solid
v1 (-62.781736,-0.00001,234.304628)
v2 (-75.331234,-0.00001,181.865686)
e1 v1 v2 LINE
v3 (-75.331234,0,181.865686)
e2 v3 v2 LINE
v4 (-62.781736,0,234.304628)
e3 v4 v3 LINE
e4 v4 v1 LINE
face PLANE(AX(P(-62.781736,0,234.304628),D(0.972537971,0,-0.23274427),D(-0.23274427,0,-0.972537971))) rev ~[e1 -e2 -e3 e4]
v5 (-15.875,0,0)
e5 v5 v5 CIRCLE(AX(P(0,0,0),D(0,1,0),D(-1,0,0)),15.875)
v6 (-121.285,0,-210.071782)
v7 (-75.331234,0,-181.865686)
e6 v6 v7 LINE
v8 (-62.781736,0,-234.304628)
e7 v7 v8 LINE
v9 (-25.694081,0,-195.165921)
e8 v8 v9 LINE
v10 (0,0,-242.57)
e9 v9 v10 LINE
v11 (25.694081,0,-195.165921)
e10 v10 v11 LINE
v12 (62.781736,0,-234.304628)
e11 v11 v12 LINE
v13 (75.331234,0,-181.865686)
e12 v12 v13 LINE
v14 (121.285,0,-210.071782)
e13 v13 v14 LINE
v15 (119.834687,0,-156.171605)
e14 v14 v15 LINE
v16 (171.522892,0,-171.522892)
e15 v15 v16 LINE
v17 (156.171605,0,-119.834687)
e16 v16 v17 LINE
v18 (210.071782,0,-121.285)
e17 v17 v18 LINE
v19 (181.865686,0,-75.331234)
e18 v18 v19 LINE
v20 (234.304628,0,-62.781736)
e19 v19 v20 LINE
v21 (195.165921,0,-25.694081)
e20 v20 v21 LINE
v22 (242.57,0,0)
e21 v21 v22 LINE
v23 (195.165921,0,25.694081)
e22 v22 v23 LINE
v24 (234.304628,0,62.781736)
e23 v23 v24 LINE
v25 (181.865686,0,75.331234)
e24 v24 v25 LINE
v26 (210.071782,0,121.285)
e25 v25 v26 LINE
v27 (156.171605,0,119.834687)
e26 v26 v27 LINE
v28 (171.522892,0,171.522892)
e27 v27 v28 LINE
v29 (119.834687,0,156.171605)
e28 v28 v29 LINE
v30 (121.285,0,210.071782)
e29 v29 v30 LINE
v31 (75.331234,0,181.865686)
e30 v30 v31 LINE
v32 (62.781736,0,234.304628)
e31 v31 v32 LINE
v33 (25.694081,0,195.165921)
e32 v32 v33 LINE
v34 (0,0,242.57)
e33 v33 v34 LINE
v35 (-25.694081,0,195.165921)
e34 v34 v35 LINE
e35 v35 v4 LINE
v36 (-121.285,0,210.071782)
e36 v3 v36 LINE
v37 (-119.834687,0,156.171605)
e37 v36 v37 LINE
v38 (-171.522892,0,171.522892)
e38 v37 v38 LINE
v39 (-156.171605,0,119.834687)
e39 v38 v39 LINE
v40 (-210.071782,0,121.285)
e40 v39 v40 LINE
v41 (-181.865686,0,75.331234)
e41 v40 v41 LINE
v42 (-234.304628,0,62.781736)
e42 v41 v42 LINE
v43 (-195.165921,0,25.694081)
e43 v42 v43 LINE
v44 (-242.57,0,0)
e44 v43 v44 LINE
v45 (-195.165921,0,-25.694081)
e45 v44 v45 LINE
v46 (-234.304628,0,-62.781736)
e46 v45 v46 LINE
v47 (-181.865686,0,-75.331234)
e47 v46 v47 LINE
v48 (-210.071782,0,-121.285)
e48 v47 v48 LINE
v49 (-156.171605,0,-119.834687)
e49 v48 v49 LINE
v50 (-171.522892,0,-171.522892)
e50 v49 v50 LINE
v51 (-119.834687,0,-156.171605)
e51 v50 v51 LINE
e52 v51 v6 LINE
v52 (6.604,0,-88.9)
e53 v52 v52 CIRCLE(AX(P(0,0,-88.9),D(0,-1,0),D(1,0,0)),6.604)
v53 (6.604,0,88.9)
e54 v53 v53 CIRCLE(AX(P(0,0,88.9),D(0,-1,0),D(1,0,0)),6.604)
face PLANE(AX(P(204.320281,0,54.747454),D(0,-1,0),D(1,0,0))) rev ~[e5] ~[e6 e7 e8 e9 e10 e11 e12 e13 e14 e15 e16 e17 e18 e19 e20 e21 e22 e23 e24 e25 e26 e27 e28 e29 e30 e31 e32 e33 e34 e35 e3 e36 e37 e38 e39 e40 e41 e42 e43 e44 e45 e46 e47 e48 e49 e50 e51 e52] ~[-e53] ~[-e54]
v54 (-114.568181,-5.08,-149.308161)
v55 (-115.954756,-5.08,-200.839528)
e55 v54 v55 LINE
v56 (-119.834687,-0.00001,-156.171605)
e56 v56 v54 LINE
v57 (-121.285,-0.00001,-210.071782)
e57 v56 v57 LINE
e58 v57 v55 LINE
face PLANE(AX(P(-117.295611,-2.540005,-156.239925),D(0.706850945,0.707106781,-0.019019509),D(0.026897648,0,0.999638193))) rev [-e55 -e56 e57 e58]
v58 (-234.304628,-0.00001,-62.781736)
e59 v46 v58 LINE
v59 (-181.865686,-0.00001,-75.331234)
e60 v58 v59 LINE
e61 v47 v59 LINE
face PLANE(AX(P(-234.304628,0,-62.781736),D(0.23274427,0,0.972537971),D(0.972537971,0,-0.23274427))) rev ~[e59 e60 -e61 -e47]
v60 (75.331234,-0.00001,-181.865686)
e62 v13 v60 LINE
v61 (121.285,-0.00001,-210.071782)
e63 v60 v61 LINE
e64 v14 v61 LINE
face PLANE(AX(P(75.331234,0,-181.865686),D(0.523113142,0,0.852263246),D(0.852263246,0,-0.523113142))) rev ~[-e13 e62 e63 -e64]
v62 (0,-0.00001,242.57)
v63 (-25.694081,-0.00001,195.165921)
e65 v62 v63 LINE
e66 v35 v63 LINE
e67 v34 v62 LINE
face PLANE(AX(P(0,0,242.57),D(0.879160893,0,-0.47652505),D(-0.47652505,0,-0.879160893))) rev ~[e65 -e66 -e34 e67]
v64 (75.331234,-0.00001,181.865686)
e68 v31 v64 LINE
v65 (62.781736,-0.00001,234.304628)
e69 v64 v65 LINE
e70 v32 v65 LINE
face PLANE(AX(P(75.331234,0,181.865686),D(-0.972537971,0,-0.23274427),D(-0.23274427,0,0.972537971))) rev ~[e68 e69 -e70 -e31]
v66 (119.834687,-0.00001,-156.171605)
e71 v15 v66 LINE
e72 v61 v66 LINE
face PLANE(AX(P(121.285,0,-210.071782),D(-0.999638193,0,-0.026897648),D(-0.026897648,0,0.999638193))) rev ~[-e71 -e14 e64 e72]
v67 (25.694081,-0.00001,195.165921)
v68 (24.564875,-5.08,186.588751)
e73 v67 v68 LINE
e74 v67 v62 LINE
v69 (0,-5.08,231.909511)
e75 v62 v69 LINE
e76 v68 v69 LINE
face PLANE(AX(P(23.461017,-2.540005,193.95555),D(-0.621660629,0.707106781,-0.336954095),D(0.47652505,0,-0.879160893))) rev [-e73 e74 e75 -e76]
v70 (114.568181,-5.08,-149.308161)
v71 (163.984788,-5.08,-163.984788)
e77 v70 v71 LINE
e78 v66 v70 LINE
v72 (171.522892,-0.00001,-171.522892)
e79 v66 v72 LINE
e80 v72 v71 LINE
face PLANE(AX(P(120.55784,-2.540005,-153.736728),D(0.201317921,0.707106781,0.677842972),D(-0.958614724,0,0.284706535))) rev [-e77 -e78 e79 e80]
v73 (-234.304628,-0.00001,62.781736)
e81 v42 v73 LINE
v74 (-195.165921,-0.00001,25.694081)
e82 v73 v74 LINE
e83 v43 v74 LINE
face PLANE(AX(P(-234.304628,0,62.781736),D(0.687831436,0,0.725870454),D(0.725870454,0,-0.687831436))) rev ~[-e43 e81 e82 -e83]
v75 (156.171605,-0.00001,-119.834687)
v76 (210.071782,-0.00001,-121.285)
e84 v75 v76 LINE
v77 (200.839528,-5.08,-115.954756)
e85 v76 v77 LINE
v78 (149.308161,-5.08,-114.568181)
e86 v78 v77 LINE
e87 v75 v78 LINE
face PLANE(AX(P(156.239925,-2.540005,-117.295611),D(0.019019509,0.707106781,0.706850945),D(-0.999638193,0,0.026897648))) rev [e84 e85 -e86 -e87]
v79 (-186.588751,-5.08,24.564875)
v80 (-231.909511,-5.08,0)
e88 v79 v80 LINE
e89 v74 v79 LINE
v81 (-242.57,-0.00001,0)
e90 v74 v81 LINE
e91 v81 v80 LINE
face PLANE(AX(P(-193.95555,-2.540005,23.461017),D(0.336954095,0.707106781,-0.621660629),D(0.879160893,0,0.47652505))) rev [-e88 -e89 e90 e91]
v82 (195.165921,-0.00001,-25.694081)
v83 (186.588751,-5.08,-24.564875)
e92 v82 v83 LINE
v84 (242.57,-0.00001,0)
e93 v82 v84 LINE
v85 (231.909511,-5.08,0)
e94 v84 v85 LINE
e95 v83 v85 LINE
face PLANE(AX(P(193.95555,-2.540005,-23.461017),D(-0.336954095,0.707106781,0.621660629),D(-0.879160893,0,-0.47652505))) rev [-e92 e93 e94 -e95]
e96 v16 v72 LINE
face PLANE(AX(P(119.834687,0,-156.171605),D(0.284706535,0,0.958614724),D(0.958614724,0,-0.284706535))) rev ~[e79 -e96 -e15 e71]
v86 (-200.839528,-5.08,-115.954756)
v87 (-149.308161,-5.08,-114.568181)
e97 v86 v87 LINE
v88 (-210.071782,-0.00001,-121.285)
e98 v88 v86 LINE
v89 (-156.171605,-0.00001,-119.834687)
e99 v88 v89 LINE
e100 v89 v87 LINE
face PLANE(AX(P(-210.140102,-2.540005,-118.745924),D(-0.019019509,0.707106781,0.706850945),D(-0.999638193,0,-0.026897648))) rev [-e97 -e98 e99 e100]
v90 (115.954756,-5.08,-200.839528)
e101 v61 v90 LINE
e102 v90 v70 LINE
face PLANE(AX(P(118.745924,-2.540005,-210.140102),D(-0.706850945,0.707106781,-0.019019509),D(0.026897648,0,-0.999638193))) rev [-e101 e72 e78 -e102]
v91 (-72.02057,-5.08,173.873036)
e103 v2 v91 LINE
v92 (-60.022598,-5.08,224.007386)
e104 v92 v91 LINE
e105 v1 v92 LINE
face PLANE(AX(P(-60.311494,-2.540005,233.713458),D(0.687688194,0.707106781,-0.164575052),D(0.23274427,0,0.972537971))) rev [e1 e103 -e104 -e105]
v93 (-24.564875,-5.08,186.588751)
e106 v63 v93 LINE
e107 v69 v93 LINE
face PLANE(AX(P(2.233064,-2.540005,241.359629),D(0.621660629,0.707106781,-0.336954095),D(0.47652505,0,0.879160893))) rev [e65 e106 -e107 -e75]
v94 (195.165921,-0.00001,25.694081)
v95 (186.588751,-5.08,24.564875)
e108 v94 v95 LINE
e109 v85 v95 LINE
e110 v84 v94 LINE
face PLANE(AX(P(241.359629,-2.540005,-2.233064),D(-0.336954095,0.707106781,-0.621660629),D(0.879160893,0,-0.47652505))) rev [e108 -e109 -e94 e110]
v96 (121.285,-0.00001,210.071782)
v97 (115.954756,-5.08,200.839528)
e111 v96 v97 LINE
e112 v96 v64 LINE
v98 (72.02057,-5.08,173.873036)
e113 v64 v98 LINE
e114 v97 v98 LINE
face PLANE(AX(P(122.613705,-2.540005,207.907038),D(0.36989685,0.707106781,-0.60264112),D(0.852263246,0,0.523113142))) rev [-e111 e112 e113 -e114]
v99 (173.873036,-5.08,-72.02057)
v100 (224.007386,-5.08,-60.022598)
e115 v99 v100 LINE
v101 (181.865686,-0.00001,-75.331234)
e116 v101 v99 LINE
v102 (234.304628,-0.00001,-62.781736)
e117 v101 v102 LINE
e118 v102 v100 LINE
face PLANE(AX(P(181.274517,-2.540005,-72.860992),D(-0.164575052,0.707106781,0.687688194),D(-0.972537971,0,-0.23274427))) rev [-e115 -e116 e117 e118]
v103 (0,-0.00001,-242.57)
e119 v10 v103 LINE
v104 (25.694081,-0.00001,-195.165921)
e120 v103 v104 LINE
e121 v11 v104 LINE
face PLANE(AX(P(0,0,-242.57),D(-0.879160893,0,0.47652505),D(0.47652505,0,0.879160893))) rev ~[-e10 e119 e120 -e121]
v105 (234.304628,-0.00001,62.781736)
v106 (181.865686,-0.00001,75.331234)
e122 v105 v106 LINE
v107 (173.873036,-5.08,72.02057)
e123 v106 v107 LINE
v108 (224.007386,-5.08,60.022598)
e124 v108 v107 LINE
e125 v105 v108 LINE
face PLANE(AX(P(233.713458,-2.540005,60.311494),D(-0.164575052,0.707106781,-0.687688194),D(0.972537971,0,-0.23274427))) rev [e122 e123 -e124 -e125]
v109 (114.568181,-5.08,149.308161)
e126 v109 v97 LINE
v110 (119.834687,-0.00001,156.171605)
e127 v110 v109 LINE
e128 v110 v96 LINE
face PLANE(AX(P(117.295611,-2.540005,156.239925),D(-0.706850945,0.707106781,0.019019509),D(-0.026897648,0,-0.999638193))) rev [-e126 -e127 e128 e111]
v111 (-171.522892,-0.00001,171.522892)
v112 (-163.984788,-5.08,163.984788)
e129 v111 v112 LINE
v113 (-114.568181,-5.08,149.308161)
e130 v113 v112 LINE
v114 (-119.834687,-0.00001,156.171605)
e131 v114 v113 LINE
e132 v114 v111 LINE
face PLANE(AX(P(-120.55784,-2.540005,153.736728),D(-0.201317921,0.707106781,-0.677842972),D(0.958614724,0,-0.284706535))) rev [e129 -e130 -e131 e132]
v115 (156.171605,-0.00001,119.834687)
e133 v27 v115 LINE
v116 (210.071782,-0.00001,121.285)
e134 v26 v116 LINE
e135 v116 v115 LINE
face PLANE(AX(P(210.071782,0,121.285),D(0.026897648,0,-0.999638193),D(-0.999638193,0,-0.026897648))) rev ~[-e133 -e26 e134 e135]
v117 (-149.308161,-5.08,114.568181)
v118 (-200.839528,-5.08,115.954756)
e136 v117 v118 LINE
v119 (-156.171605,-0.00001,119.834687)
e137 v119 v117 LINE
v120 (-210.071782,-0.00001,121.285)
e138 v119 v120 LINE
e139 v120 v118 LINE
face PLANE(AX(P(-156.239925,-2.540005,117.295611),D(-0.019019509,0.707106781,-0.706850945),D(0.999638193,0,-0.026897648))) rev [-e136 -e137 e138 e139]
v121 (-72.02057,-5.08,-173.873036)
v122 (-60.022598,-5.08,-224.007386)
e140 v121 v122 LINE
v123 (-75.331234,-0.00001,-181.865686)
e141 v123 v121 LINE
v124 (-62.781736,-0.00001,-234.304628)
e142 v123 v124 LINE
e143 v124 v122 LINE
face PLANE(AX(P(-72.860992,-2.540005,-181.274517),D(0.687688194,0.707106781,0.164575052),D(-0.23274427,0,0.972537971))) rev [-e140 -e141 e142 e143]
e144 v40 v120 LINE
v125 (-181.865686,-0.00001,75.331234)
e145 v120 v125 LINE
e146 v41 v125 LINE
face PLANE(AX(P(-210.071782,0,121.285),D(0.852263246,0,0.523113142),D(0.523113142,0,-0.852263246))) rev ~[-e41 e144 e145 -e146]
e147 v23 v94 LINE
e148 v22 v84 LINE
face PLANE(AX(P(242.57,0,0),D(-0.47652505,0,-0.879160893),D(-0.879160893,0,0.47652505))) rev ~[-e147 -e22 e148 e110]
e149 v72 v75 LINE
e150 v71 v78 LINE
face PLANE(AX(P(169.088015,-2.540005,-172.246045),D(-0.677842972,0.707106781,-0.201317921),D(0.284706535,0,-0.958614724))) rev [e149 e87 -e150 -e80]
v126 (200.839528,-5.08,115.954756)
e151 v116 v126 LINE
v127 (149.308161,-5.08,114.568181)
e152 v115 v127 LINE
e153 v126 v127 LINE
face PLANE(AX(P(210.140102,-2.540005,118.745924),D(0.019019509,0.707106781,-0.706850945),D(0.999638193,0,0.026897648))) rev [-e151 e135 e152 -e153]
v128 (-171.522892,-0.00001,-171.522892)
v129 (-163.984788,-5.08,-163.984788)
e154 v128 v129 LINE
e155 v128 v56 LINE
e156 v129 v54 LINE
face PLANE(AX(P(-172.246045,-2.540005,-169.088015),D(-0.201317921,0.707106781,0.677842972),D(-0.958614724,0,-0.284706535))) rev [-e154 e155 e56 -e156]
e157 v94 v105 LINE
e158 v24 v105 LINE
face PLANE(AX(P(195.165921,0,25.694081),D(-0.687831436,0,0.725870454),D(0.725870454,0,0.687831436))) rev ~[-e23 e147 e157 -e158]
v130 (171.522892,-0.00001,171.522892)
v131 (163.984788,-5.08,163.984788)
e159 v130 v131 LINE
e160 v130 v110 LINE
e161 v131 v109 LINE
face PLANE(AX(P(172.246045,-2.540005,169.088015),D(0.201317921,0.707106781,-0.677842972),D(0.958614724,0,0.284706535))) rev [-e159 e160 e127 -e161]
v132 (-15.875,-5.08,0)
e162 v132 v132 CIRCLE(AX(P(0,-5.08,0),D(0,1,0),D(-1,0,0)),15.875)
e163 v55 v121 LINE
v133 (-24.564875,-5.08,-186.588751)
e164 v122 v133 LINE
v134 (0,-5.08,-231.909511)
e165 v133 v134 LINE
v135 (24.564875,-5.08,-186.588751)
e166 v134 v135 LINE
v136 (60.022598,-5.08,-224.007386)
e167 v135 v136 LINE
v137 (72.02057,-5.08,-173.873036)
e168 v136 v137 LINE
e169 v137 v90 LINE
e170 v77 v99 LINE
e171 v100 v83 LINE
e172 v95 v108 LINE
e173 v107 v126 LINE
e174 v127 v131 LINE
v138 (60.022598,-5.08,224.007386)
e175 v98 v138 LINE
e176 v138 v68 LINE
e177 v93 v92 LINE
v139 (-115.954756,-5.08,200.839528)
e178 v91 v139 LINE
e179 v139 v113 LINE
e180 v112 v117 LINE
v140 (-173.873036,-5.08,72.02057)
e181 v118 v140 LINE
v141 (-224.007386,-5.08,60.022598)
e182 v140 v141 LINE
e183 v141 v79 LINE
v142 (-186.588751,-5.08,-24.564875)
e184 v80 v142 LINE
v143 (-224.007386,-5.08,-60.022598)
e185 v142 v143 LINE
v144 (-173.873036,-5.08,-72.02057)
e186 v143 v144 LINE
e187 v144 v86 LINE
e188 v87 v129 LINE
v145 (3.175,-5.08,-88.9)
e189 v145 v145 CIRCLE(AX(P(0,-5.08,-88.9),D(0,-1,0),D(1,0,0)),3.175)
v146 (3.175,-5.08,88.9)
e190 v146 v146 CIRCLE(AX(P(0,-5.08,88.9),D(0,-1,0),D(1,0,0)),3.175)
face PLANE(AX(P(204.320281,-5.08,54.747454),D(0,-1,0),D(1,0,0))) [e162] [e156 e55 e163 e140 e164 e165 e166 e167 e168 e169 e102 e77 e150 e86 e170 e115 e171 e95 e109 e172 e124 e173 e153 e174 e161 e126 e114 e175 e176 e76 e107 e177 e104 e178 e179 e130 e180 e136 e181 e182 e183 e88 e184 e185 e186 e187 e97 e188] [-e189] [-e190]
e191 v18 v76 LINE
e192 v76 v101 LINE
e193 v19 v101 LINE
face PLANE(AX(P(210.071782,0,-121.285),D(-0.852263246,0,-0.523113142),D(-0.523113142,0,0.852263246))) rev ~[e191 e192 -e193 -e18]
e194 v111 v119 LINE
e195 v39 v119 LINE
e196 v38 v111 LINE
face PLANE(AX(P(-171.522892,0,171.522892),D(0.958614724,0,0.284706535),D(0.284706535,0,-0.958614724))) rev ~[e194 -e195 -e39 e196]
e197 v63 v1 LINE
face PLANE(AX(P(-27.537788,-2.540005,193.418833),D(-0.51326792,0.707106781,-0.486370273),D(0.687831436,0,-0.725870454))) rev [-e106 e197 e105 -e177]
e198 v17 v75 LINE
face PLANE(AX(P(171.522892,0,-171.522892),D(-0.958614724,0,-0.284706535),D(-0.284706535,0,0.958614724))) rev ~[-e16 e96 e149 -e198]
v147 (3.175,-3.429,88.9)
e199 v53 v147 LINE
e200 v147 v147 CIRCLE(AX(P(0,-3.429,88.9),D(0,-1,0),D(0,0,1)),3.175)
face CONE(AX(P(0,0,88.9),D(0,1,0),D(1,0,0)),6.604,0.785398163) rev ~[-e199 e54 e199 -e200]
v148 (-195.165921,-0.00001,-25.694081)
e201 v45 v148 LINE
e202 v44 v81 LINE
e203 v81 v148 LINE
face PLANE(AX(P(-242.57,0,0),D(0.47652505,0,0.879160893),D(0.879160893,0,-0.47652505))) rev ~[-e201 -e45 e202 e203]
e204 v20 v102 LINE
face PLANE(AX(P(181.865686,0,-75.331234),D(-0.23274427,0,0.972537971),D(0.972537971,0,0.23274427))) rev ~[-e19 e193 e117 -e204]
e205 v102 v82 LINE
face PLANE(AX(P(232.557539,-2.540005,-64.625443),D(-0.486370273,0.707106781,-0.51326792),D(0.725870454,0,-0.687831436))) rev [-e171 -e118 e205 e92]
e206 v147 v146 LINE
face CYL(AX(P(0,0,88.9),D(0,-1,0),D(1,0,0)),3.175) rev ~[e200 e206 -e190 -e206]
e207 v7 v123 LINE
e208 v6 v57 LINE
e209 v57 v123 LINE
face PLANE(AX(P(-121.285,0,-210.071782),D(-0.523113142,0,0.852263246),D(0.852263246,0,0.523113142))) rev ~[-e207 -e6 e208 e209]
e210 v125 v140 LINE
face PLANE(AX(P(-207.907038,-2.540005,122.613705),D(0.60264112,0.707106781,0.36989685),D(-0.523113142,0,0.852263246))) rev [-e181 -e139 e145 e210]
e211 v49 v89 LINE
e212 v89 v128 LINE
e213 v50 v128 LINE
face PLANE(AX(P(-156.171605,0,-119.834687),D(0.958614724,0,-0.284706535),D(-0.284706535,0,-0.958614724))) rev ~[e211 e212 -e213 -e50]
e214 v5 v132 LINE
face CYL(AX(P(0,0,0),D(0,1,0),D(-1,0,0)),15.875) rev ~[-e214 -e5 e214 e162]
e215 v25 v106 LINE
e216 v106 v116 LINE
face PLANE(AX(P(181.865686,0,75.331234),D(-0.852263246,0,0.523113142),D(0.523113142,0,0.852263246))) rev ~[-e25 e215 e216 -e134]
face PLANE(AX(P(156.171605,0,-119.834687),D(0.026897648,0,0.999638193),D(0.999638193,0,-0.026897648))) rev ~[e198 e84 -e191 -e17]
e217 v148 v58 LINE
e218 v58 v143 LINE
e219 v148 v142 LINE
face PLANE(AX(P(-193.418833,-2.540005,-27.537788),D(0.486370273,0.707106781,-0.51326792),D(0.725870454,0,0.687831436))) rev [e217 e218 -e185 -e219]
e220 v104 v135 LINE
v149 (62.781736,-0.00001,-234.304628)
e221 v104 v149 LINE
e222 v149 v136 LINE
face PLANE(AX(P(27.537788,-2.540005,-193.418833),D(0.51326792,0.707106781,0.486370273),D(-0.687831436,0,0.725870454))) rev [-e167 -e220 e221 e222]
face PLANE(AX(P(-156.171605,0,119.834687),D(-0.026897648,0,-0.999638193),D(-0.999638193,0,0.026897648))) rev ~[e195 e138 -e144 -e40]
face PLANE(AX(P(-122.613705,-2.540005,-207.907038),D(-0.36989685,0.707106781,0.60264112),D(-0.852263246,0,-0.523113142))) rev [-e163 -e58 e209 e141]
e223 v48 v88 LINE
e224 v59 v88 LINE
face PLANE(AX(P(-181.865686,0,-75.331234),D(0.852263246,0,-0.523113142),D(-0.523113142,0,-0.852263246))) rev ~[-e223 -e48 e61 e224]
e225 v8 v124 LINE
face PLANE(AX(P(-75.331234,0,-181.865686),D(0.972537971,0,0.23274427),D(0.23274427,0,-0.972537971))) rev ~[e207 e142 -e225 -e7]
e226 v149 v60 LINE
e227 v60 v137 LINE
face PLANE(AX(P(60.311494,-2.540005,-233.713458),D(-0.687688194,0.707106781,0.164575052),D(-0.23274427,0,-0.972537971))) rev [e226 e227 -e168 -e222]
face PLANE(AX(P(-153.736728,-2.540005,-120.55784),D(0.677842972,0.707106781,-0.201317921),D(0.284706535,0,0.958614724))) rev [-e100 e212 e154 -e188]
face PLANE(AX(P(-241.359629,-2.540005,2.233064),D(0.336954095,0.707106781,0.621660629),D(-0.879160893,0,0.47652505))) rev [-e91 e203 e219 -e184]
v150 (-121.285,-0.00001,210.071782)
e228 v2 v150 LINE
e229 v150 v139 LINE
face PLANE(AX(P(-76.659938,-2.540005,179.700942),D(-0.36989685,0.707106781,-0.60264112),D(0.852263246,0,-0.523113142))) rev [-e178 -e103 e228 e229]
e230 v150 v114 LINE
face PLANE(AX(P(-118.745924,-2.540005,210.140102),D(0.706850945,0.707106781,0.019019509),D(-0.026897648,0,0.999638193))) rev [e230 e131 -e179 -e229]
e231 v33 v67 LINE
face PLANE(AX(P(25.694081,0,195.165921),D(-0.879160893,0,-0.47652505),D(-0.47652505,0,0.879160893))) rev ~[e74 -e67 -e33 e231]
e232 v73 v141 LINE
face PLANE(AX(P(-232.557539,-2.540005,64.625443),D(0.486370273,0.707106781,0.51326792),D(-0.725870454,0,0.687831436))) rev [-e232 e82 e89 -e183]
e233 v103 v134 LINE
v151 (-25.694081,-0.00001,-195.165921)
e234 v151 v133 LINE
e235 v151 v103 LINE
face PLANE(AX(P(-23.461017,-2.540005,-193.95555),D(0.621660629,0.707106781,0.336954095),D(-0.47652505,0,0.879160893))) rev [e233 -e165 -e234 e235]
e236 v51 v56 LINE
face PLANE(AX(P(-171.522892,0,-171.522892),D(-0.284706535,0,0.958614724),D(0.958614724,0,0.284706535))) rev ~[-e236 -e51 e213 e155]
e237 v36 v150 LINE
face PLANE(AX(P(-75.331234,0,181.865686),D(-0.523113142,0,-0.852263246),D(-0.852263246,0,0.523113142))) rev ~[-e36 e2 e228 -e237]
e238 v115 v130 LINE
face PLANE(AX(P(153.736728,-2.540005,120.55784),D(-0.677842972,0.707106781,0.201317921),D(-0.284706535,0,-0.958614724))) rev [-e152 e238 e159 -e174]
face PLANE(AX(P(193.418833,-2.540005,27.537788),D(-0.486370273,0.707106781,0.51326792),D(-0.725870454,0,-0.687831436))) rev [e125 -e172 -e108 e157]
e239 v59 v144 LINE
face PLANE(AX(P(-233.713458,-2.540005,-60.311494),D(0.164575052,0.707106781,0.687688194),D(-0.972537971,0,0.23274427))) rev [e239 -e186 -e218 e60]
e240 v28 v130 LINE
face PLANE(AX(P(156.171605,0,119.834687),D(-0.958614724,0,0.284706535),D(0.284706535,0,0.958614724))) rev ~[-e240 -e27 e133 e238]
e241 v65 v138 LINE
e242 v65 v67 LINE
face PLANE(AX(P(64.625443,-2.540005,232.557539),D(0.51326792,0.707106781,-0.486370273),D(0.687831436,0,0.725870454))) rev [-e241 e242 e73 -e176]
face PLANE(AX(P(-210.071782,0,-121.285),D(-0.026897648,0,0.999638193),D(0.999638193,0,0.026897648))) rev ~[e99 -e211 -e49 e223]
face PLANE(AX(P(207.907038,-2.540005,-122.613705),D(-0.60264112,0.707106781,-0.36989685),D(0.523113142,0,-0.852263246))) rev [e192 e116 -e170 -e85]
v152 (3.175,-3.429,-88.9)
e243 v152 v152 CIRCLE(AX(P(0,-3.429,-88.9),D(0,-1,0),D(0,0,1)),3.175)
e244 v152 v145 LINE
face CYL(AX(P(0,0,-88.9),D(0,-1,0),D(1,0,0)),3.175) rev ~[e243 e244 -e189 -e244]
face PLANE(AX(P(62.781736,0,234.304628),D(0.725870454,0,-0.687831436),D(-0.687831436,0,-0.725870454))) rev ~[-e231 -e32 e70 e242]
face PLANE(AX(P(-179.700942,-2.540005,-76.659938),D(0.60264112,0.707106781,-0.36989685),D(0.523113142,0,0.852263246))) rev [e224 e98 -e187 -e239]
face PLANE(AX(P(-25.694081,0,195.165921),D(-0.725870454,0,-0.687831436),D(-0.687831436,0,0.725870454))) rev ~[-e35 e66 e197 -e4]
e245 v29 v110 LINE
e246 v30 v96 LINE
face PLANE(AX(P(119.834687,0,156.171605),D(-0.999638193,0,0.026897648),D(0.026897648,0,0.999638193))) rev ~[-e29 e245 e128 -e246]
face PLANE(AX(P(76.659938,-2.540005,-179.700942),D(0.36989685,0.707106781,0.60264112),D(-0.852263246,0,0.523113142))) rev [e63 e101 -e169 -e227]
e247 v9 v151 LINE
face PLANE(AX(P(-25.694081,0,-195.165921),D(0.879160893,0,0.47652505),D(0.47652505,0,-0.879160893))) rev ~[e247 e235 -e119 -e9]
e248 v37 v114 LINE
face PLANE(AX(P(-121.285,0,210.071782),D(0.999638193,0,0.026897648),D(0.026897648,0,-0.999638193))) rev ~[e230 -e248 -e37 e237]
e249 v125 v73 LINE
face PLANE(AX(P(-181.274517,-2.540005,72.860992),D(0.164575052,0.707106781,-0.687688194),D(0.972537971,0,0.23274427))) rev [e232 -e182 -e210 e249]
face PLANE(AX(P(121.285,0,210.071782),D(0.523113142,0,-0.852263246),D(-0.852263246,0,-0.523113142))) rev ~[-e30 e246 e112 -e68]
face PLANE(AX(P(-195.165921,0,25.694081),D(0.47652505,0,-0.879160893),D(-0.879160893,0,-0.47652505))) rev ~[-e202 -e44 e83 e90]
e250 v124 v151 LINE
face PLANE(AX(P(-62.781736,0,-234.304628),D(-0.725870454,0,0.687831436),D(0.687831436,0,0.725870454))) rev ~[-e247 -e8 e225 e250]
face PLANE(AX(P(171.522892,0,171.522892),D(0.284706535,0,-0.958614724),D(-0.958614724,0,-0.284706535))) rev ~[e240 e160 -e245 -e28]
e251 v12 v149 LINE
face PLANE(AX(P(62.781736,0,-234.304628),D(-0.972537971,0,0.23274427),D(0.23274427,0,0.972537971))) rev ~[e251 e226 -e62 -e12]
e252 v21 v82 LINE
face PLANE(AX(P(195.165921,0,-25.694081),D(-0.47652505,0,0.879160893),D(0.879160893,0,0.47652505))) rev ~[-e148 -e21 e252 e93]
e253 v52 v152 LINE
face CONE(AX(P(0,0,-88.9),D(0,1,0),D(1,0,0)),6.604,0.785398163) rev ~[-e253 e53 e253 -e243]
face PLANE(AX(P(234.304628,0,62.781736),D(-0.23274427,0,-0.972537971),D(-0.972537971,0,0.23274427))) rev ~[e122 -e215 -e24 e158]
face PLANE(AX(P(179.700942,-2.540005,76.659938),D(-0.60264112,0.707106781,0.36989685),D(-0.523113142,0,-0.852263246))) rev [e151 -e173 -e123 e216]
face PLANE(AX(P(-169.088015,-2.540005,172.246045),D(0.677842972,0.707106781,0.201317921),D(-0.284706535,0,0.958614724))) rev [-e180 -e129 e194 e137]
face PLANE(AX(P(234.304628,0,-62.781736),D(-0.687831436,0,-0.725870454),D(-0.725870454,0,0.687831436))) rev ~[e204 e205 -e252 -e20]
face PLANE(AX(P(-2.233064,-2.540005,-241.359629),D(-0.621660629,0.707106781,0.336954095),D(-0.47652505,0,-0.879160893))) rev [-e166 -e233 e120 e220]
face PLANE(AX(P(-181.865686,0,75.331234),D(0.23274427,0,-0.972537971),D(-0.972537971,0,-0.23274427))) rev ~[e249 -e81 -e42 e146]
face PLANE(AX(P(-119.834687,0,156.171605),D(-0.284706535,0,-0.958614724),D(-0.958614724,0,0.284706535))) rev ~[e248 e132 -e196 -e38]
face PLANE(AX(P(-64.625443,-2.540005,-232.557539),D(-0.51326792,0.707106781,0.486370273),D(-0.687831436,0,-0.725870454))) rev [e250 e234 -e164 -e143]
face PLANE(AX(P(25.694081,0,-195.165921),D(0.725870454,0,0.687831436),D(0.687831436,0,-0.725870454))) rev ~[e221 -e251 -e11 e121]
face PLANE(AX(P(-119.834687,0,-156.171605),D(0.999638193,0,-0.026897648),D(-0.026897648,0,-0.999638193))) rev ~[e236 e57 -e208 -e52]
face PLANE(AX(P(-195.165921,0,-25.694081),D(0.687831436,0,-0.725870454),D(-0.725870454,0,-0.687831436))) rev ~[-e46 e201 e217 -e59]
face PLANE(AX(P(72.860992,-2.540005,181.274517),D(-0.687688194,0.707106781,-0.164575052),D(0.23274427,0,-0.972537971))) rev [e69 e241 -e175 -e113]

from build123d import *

# Parameters (mm, degrees)
F1_DEPTH       = 5.08
F2_SIZE        = 5.07999
F4_D           = 6.35
F4_CSINK_D     = 13.208
F4_CSINK_ANGLE = 90
F5_R           = 15.875
F6_DEPTH       = 25.4


# Not quite as in the source:
# - a fillet or chamfer is up to 0.001 mm smaller than in the source, because OpenCascade refuses the exact size


with BuildPart() as f1:
    # F0 (on Front) → F1 (new body)
    with BuildSketch(Plane.XZ):
        with BuildLine():
            ThreePointArc((181.8656859748, 75.3312336611), (190.142498905, 50.9485290284), (195.1659209614, 25.6940809385))
            Line((195.1659209614, 25.6940809385), (234.3046276829, 62.7817357705))
            Line((234.3046276829, 62.7817357705), (181.8656859748, 75.3312336611))
        make_face()
        with BuildLine():
            ThreePointArc((156.1716050363, 119.8346873004), (170.477100735, 98.425), (181.8656859748, 75.3312336611))
            Line((181.8656859748, 75.3312336611), (210.071782196, 121.285))
            Line((210.071782196, 121.285), (156.1716050363, 119.8346873004))
        make_face()
        with BuildLine():
            ThreePointArc((119.8346873004, 156.1716050363), (139.1939698766, 139.1939698766), (156.1716050363, 119.8346873004))
            Line((156.1716050363, 119.8346873004), (171.5228919124, 171.5228919124))
            Line((171.5228919124, 171.5228919124), (119.8346873004, 156.1716050363))
        make_face()
        with BuildLine():
            ThreePointArc((75.3312336611, 181.8656859748), (98.425, 170.477100735), (119.8346873004, 156.1716050363))
            Line((119.8346873004, 156.1716050363), (121.285, 210.071782196))
            Line((121.285, 210.071782196), (75.3312336611, 181.8656859748))
        make_face()
        with BuildLine():
            ThreePointArc((25.6940809385, 195.1659209614), (50.9485290284, 190.142498905), (75.3312336611, 181.8656859748))
            Line((75.3312336611, 181.8656859748), (62.7817357705, 234.3046276829))
            Line((62.7817357705, 234.3046276829), (25.6940809385, 195.1659209614))
        make_face()
        with BuildLine():
            ThreePointArc((-25.6940809385, 195.1659209614), (0, 196.85), (25.6940809385, 195.1659209614))
            Line((25.6940809385, 195.1659209614), (0, 242.57))
            Line((0, 242.57), (-25.6940809385, 195.1659209614))
        make_face()
        with BuildLine():
            ThreePointArc((-75.3312336611, 181.8656859748), (-50.9485290284, 190.142498905), (-25.6940809385, 195.1659209614))
            Line((-25.6940809385, 195.1659209614), (-62.7817357705, 234.3046276829))
            Line((-62.7817357705, 234.3046276829), (-75.3312336611, 181.8656859748))
        make_face()
        with BuildLine():
            ThreePointArc((-119.8346873004, 156.1716050363), (-98.425, 170.477100735), (-75.3312336611, 181.8656859748))
            Line((-75.3312336611, 181.8656859748), (-121.285, 210.071782196))
            Line((-121.285, 210.071782196), (-119.8346873004, 156.1716050363))
        make_face()
        with BuildLine():
            ThreePointArc((-156.1716050363, 119.8346873004), (-139.1939698766, 139.1939698766), (-119.8346873004, 156.1716050363))
            Line((-119.8346873004, 156.1716050363), (-171.5228919124, 171.5228919124))
            Line((-171.5228919124, 171.5228919124), (-156.1716050363, 119.8346873004))
        make_face()
        with BuildLine():
            ThreePointArc((-181.8656859748, 75.3312336611), (-170.477100735, 98.425), (-156.1716050363, 119.8346873004))
            Line((-156.1716050363, 119.8346873004), (-210.071782196, 121.285))
            Line((-210.071782196, 121.285), (-181.8656859748, 75.3312336611))
        make_face()
        with BuildLine():
            ThreePointArc((-195.1659209614, 25.6940809385), (-190.142498905, 50.9485290284), (-181.8656859748, 75.3312336611))
            Line((-181.8656859748, 75.3312336611), (-234.3046276829, 62.7817357705))
            Line((-234.3046276829, 62.7817357705), (-195.1659209614, 25.6940809385))
        make_face()
        with BuildLine():
            ThreePointArc((-195.1659209614, -25.6940809385), (-196.85, 0), (-195.1659209614, 25.6940809385))
            Line((-195.1659209614, 25.6940809385), (-242.57, 0))
            Line((-242.57, 0), (-195.1659209614, -25.6940809385))
        make_face()
        with BuildLine():
            Line((-234.3046276829, -62.7817357705), (-181.8656859748, -75.3312336611))
            ThreePointArc((-181.8656859748, -75.3312336611), (-190.142498905, -50.9485290284), (-195.1659209614, -25.6940809385))
            Line((-195.1659209614, -25.6940809385), (-234.3046276829, -62.7817357705))
        make_face()
        with BuildLine():
            Line((-210.071782196, -121.285), (-156.1716050363, -119.8346873004))
            ThreePointArc((-156.1716050363, -119.8346873004), (-170.477100735, -98.425), (-181.8656859748, -75.3312336611))
            Line((-181.8656859748, -75.3312336611), (-210.071782196, -121.285))
        make_face()
        with BuildLine():
            Line((-171.5228919124, -171.5228919124), (-119.8346873004, -156.1716050363))
            ThreePointArc((-119.8346873004, -156.1716050363), (-139.1939698766, -139.1939698766), (-156.1716050363, -119.8346873004))
            Line((-156.1716050363, -119.8346873004), (-171.5228919124, -171.5228919124))
        make_face()
        with BuildLine():
            Line((-121.285, -210.071782196), (-75.3312336611, -181.8656859748))
            ThreePointArc((-75.3312336611, -181.8656859748), (-98.425, -170.477100735), (-119.8346873004, -156.1716050363))
            Line((-119.8346873004, -156.1716050363), (-121.285, -210.071782196))
        make_face()
        with BuildLine():
            Line((-62.7817357705, -234.3046276829), (-25.6940809385, -195.1659209614))
            ThreePointArc((-25.6940809385, -195.1659209614), (-50.9485290284, -190.142498905), (-75.3312336611, -181.8656859748))
            Line((-75.3312336611, -181.8656859748), (-62.7817357705, -234.3046276829))
        make_face()
        with BuildLine():
            Line((0, -242.57), (25.6940809385, -195.1659209614))
            ThreePointArc((25.6940809385, -195.1659209614), (0, -196.85), (-25.6940809385, -195.1659209614))
            Line((-25.6940809385, -195.1659209614), (0, -242.57))
        make_face()
        with BuildLine():
            Line((62.7817357705, -234.3046276829), (75.3312336611, -181.8656859748))
            ThreePointArc((75.3312336611, -181.8656859748), (50.9485290284, -190.142498905), (25.6940809385, -195.1659209614))
            Line((25.6940809385, -195.1659209614), (62.7817357705, -234.3046276829))
        make_face()
        with BuildLine():
            Line((121.285, -210.071782196), (119.8346873004, -156.1716050363))
            ThreePointArc((119.8346873004, -156.1716050363), (98.425, -170.477100735), (75.3312336611, -181.8656859748))
            Line((75.3312336611, -181.8656859748), (121.285, -210.071782196))
        make_face()
        with BuildLine():
            Line((171.5228919124, -171.5228919124), (156.1716050363, -119.8346873004))
            ThreePointArc((156.1716050363, -119.8346873004), (139.1939698766, -139.1939698766), (119.8346873004, -156.1716050363))
            Line((119.8346873004, -156.1716050363), (171.5228919124, -171.5228919124))
        make_face()
        with BuildLine():
            Line((210.071782196, -121.285), (181.8656859748, -75.3312336611))
            ThreePointArc((181.8656859748, -75.3312336611), (170.477100735, -98.425), (156.1716050363, -119.8346873004))
            Line((156.1716050363, -119.8346873004), (210.071782196, -121.285))
        make_face()
        with BuildLine():
            Line((234.3046276829, -62.7817357705), (195.1659209614, -25.6940809385))
            ThreePointArc((195.1659209614, -25.6940809385), (190.142498905, -50.9485290284), (181.8656859748, -75.3312336611))
            Line((181.8656859748, -75.3312336611), (234.3046276829, -62.7817357705))
        make_face()
        with BuildLine():
            ThreePointArc((195.1659209614, 25.6940809385), (196.4285290395, 12.874605989), (196.85, 0))
            ThreePointArc((196.85, 0), (196.4285290395, -12.874605989), (195.1659209614, -25.6940809385))
            Line((195.1659209614, -25.6940809385), (242.57, 0))
            Line((242.57, 0), (195.1659209614, 25.6940809385))
        make_face()
        with BuildLine():
            ThreePointArc((195.1659209614, -25.6940809385), (196.4285290395, -12.874605989), (196.85, 0))
            ThreePointArc((196.85, 0), (196.4285290395, 12.874605989), (195.1659209614, 25.6940809385))
            ThreePointArc((195.1659209614, 25.6940809385), (190.142498905, 50.9485290284), (181.8656859748, 75.3312336611))
            ThreePointArc((181.8656859748, 75.3312336611), (170.477100735, 98.425), (156.1716050363, 119.8346873004))
            ThreePointArc((156.1716050363, 119.8346873004), (139.1939698766, 139.1939698766), (119.8346873004, 156.1716050363))
            ThreePointArc((119.8346873004, 156.1716050363), (98.425, 170.477100735), (75.3312336611, 181.8656859748))
            ThreePointArc((75.3312336611, 181.8656859748), (50.9485290284, 190.142498905), (25.6940809385, 195.1659209614))
            ThreePointArc((25.6940809385, 195.1659209614), (0, 196.85), (-25.6940809385, 195.1659209614))
            ThreePointArc((-25.6940809385, 195.1659209614), (-50.9485290284, 190.142498905), (-75.3312336611, 181.8656859748))
            ThreePointArc((-75.3312336611, 181.8656859748), (-98.425, 170.477100735), (-119.8346873004, 156.1716050363))
            ThreePointArc((-119.8346873004, 156.1716050363), (-139.1939698766, 139.1939698766), (-156.1716050363, 119.8346873004))
            ThreePointArc((-156.1716050363, 119.8346873004), (-170.477100735, 98.425), (-181.8656859748, 75.3312336611))
            ThreePointArc((-181.8656859748, 75.3312336611), (-190.142498905, 50.9485290284), (-195.1659209614, 25.6940809385))
            ThreePointArc((-195.1659209614, 25.6940809385), (-196.85, 0), (-195.1659209614, -25.6940809385))
            ThreePointArc((-195.1659209614, -25.6940809385), (-190.142498905, -50.9485290284), (-181.8656859748, -75.3312336611))
            ThreePointArc((-181.8656859748, -75.3312336611), (-170.477100735, -98.425), (-156.1716050363, -119.8346873004))
            ThreePointArc((-156.1716050363, -119.8346873004), (-139.1939698766, -139.1939698766), (-119.8346873004, -156.1716050363))
            ThreePointArc((-119.8346873004, -156.1716050363), (-98.425, -170.477100735), (-75.3312336611, -181.8656859748))
            ThreePointArc((-75.3312336611, -181.8656859748), (-50.9485290284, -190.142498905), (-25.6940809385, -195.1659209614))
            ThreePointArc((-25.6940809385, -195.1659209614), (0, -196.85), (25.6940809385, -195.1659209614))
            ThreePointArc((25.6940809385, -195.1659209614), (50.9485290284, -190.142498905), (75.3312336611, -181.8656859748))
            ThreePointArc((75.3312336611, -181.8656859748), (98.425, -170.477100735), (119.8346873004, -156.1716050363))
            ThreePointArc((119.8346873004, -156.1716050363), (139.1939698766, -139.1939698766), (156.1716050363, -119.8346873004))
            ThreePointArc((156.1716050363, -119.8346873004), (170.477100735, -98.425), (181.8656859748, -75.3312336611))
            ThreePointArc((181.8656859748, -75.3312336611), (190.142498905, -50.9485290284), (195.1659209614, -25.6940809385))
        make_face()
    extrude(amount=F1_DEPTH)

    # F2 (size 5.08 in the source; OpenCascade refuses exactly that, so slightly less here)
    f2_edges = [f1.edges().sort_by_distance(p)[0] for p in [
        (208.085157, -5.08, 69.056485),
        (195.968734, -5.08, 98.308117),
        (183.121694, -5.08, 120.559844),
        (163.847248, -5.08, 145.67879),
        (145.67879, -5.08, 163.847248),
        (120.559844, -5.08, 183.121694),
        (98.308117, -5.08, 195.968734),
        (69.056485, -5.08, 208.085157),
        (44.237908, -5.08, 214.735274),
        (12.84704, -5.08, 218.86796),
        (-12.84704, -5.08, 218.86796),
        (-44.237908, -5.08, 214.735274),
        (-69.056485, -5.08, 208.085157),
        (-98.308117, -5.08, 195.968734),
        (-120.559844, -5.08, 183.121694),
        (-145.67879, -5.08, 163.847248),
        (-163.847248, -5.08, 145.67879),
        (-183.121694, -5.08, 120.559844),
        (-195.968734, -5.08, 98.308117),
        (-208.085157, -5.08, 69.056485),
        (-214.735274, -5.08, 44.237908),
        (-218.86796, -5.08, 12.84704),
        (-218.86796, -5.08, -12.84704),
        (-214.735274, -5.08, -44.237908),
        (-208.085157, -5.08, -69.056485),
        (-195.968734, -5.08, -98.308117),
        (-183.121694, -5.08, -120.559844),
        (-163.847248, -5.08, -145.67879),
        (-145.67879, -5.08, -163.847248),
        (-120.559844, -5.08, -183.121694),
        (-98.308117, -5.08, -195.968734),
        (-69.056485, -5.08, -208.085157),
        (-44.237908, -5.08, -214.735274),
        (-12.84704, -5.08, -218.86796),
        (12.84704, -5.08, -218.86796),
        (44.237908, -5.08, -214.735274),
        (69.056485, -5.08, -208.085157),
        (98.308117, -5.08, -195.968734),
        (120.559844, -5.08, -183.121694),
        (145.67879, -5.08, -163.847248),
        (163.847248, -5.08, -145.67879),
        (183.121694, -5.08, -120.559844),
        (195.968734, -5.08, -98.308117),
        (208.085157, -5.08, -69.056485),
        (214.735274, -5.08, -44.237908),
        (218.86796, -5.08, -12.84704),
        (218.86796, -5.08, 12.84704),
        (214.735274, -5.08, 44.237908),
    ]]
    chamfer(f2_edges, length=F2_SIZE)

    # F4 (through all)
    with Locations(Plane(origin=(0, 0, 0), x_dir=(-1, 0, 0), z_dir=(0, 1, 0))):
        with Locations((0, 88.9), (0, -88.9)):
            CounterSinkHole(F4_D / 2, F4_CSINK_D / 2, counter_sink_angle=F4_CSINK_ANGLE)

    # F5 (on face) → F6 (cut)
    with BuildSketch(Plane(origin=(0, 0, 0), x_dir=(-1, 0, 0), z_dir=(0, 1, 0))):
        Circle(F5_R)
    extrude(amount=-F6_DEPTH, mode=Mode.SUBTRACT)


solid = f1.part
